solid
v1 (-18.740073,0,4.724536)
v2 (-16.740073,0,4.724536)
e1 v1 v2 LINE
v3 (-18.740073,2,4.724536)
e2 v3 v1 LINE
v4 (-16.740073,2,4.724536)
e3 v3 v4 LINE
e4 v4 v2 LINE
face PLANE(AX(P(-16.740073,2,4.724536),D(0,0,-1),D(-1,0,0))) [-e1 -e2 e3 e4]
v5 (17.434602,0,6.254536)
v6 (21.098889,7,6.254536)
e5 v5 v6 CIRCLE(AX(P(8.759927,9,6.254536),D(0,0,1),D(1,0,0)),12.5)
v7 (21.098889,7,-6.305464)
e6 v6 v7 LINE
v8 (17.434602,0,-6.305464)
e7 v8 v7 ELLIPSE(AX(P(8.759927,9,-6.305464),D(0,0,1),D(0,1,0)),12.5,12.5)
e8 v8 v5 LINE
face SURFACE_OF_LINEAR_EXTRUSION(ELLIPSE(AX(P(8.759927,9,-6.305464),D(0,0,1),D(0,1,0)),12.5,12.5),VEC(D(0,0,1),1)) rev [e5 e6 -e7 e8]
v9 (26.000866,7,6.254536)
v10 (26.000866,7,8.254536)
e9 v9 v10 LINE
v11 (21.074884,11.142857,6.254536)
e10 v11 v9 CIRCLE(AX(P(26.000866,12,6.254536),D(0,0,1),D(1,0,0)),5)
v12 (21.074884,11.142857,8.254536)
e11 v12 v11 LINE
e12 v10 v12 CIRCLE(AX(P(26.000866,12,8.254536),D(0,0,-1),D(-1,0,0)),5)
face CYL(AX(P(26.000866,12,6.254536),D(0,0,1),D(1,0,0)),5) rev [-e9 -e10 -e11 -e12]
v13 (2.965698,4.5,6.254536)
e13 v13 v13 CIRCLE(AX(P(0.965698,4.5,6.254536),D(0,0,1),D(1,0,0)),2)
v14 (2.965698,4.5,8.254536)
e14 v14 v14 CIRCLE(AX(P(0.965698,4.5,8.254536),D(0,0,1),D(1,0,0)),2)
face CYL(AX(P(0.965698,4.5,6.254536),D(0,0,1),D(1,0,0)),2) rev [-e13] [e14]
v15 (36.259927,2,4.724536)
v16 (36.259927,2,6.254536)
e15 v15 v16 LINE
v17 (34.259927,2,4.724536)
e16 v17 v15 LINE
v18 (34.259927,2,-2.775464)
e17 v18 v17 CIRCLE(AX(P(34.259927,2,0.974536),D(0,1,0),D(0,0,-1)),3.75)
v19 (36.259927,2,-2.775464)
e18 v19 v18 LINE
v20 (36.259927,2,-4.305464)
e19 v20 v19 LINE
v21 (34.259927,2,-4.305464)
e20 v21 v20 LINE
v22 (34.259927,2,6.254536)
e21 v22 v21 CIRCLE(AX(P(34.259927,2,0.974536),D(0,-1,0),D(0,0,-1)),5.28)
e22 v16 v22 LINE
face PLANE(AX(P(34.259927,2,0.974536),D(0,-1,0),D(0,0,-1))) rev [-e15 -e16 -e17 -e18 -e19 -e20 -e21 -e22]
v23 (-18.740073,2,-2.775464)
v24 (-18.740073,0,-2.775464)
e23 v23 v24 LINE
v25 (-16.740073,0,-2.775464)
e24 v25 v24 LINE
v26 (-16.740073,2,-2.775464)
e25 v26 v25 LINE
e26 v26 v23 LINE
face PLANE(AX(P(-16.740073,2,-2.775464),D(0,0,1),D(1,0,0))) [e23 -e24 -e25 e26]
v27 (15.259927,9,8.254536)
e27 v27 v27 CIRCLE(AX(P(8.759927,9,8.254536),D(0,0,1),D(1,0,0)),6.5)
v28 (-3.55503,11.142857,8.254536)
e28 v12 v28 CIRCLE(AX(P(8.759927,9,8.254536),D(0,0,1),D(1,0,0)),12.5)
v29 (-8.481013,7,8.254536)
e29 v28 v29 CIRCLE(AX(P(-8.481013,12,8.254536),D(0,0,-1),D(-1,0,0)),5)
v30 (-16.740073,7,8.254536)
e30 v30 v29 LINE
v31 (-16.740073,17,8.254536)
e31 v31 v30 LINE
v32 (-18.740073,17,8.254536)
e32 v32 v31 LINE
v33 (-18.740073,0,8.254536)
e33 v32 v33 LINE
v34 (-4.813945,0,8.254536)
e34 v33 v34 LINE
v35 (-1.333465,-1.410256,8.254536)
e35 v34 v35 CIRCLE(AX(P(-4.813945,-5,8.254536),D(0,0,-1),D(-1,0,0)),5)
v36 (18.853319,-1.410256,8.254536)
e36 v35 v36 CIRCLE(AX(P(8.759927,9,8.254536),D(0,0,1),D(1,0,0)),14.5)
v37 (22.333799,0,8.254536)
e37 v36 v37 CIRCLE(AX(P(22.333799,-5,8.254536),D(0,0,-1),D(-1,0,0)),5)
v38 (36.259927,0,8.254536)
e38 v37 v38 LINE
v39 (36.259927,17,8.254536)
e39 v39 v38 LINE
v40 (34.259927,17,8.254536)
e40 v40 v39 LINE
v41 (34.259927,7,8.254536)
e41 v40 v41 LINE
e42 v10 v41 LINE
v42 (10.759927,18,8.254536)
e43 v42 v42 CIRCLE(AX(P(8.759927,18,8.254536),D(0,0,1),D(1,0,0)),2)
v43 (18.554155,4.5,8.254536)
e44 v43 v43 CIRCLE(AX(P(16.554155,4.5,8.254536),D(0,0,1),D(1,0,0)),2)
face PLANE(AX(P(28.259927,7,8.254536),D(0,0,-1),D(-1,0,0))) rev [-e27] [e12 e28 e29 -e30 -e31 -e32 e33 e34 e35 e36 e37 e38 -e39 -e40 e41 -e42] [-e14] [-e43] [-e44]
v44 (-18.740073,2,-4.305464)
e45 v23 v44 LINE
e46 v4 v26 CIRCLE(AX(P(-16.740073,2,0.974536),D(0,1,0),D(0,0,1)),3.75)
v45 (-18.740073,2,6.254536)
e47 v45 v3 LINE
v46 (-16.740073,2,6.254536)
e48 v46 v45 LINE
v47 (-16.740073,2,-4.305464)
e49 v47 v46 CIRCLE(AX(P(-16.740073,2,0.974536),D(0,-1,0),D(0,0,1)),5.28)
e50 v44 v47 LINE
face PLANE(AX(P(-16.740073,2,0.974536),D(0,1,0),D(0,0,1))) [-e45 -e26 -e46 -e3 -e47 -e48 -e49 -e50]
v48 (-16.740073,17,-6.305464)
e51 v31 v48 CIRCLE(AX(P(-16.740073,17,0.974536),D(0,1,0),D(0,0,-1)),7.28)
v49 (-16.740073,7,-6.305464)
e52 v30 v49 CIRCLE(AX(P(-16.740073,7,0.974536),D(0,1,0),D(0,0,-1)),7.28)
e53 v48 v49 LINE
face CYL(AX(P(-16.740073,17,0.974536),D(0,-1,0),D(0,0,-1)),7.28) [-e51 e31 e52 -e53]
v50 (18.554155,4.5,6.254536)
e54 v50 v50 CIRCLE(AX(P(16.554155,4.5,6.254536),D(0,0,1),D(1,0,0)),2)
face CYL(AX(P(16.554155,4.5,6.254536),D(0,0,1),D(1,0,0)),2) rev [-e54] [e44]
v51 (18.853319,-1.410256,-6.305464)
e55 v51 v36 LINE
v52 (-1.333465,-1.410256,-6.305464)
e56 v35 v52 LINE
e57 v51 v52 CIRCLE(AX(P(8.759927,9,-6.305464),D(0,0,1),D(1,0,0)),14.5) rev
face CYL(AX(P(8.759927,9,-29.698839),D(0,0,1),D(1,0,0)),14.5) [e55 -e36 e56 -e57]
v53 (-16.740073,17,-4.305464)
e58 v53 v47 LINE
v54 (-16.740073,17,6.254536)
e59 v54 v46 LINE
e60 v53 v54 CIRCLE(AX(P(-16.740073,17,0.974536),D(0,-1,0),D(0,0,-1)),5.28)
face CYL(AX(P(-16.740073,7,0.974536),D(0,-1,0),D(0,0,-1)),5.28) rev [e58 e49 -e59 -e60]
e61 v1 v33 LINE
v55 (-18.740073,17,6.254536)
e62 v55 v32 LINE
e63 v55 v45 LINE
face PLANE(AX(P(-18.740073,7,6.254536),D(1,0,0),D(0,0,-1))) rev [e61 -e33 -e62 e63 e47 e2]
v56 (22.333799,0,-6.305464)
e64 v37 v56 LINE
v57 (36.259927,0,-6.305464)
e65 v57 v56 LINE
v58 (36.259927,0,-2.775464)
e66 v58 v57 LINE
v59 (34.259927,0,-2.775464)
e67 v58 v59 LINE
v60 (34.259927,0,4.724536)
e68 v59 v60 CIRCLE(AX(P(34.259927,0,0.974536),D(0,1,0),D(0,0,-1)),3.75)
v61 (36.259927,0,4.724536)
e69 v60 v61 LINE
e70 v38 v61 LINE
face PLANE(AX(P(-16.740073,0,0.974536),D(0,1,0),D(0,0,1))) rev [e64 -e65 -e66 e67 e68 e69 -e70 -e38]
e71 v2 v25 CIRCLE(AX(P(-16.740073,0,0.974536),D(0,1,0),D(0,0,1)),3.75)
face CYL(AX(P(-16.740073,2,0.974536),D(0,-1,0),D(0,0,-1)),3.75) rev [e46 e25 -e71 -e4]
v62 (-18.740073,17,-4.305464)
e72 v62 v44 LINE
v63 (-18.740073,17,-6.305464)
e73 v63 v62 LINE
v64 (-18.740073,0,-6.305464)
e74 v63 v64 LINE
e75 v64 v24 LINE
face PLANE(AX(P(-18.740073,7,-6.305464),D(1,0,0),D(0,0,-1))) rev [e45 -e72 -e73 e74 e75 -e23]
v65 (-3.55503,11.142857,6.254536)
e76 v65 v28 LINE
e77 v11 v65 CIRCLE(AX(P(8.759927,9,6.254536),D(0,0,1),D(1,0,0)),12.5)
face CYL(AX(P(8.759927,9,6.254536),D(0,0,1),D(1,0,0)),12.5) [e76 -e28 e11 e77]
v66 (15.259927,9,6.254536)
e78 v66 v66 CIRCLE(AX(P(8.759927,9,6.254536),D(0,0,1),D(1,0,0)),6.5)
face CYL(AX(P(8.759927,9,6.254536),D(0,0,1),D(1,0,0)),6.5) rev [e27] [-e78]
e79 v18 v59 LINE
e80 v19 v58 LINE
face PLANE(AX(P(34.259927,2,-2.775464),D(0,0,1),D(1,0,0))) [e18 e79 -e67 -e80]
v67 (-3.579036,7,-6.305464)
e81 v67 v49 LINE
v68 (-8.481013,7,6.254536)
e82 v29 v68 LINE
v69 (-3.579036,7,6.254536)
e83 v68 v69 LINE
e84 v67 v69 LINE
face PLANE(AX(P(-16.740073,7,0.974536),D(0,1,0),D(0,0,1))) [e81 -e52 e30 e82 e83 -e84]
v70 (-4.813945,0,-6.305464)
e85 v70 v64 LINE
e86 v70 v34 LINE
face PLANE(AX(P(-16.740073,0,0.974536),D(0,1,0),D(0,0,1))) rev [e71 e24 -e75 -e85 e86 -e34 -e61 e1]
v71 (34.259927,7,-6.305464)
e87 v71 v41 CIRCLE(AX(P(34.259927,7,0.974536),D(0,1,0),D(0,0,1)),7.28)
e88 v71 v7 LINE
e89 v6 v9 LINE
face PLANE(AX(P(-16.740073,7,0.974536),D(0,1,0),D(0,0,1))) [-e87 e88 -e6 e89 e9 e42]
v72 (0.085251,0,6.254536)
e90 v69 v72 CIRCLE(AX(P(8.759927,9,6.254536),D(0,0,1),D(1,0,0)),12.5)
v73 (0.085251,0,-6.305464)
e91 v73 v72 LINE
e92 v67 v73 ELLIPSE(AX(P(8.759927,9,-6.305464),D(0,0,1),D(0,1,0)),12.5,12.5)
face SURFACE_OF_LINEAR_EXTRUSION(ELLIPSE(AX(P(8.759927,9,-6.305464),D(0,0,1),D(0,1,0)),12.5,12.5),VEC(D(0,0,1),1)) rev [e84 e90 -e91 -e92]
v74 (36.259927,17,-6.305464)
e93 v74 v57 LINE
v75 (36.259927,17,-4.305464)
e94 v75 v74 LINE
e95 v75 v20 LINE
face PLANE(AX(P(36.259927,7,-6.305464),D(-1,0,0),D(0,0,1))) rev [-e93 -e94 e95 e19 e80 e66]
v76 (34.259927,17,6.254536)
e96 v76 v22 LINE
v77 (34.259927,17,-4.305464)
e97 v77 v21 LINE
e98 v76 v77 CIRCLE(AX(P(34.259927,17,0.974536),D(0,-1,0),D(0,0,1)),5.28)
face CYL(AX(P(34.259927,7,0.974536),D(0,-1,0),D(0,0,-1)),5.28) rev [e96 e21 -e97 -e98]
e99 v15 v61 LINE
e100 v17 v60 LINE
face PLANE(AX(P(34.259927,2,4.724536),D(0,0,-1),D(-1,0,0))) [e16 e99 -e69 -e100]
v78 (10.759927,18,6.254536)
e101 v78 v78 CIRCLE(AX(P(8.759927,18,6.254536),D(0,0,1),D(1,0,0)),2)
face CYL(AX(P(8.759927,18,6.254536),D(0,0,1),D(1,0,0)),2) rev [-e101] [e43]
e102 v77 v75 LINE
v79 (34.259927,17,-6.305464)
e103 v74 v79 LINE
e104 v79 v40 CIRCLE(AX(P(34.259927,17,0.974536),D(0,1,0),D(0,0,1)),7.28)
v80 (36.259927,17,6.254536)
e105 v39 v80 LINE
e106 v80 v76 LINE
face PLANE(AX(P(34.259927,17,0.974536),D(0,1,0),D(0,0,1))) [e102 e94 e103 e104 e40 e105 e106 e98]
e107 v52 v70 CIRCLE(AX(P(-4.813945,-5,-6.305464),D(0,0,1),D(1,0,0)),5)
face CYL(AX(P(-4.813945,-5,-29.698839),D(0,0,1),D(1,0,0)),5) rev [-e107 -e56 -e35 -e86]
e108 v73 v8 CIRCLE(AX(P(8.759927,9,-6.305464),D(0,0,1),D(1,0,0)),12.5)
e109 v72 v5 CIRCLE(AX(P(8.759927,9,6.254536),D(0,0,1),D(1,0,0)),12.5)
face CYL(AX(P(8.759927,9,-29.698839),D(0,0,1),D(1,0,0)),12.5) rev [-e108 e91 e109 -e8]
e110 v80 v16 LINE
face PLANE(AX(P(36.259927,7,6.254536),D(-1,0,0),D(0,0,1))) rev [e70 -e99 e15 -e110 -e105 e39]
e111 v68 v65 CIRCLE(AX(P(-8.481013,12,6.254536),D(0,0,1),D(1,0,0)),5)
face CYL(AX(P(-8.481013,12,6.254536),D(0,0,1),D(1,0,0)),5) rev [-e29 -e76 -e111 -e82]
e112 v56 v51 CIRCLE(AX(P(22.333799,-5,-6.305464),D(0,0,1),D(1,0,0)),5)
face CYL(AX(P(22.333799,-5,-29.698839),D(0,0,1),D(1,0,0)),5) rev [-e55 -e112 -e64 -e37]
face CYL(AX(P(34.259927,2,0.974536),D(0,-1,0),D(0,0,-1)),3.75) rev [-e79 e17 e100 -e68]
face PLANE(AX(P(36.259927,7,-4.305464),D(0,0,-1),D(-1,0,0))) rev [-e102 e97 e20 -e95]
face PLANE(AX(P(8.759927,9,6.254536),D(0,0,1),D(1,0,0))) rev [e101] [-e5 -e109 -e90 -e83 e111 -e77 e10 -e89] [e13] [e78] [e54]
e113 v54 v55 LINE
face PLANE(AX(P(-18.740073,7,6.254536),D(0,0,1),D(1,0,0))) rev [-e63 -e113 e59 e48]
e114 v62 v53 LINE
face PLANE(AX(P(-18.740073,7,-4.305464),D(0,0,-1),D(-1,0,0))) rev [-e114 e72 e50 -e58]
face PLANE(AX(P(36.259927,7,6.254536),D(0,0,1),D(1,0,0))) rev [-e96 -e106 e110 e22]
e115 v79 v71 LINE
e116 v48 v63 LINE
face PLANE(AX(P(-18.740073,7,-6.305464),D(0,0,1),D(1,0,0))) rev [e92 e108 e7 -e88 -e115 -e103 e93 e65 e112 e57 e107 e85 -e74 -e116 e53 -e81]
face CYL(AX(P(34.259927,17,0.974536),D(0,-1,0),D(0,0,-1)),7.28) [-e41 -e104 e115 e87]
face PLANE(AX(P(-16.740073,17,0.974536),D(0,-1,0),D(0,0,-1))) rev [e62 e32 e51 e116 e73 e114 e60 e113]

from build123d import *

# Parameters (mm, degrees)
BOSS_EXTRU_1_DEPTH      = 7
BOSS_EXTRU_3_DEPTH      = 2
ESQUISSE2_RX            = 12.5
ESQUISSE2_RY            = 12.5
ENL_V_MAT_EXTRU_1_DEPTH = 40.69604363
ESQUISSE3_R             = 12.5
ESQUISSE3_R_2           = 6.5
ESQUISSE3_R_3           = 2
BOSS_EXTRU_2_DEPTH      = 2
BOSS_EXTRU_4_DEPTH      = 14.56
CONG_2_R                = 5
BOSS_EXTRU_5_DEPTH      = 10


with BuildPart() as part:
    # Esquisse1 → Boss.-Extru.1 (new body)
    with BuildSketch(Plane(origin=(0, 0, 0), x_dir=(1, 0, 0), z_dir=(0, 1, 0))):
        with BuildLine():
            Line((36.259926639, -6.254535912), (36.259926639, -8.254535912))
            Line((36.259926639, -8.254535912), (28.259926639, -8.254535912))
            Line((28.259926639, -8.254535912), (26.259926639, -8.254535912))
            Line((26.259926639, -8.254535912), (-8.740073361, -8.254535912))
            Line((-8.740073361, -8.254535912), (-10.740073361, -8.254535912))
            Line((-10.740073361, -8.254535912), (-18.740073361, -8.254535912))
            Line((-18.740073361, -8.254535912), (-18.740073361, -6.254535912))
            Line((-18.740073361, -6.254535912), (-16.740073361, -6.254535912))
            ThreePointArc((-16.740073361, -6.254535912), (-13.378645093, -5.04629229), (-11.555635108, -1.974535912))
            ThreePointArc((-11.555635108, -1.974535912), (-11.460073361, -0.974535912), (-11.555635108, 0.025464088))
            ThreePointArc((-11.555635108, 0.025464088), (-13.378645093, 3.097220466), (-16.740073361, 4.305464088))
            Line((-16.740073361, 4.305464088), (-18.740073361, 4.305464088))
            Line((-18.740073361, 4.305464088), (-18.740073361, 6.305464088))
            Line((-18.740073361, 6.305464088), (-10.740073361, 6.305464088))
            Line((-10.740073361, 6.305464088), (-8.740073361, 6.305464088))
            Line((-8.740073361, 6.305464088), (26.259926639, 6.305464088))
            Line((26.259926639, 6.305464088), (28.259926639, 6.305464088))
            Line((28.259926639, 6.305464088), (36.259926639, 6.305464088))
            Line((36.259926639, 6.305464088), (36.259926639, 4.305464088))
            Line((36.259926639, 4.305464088), (34.259926639, 4.305464088))
            ThreePointArc((34.259926639, 4.305464088), (30.898498371, 3.097220466), (29.075488386, 0.025464088))
            ThreePointArc((29.075488386, 0.025464088), (28.979926639, -0.974535912), (29.075488386, -1.974535912))
            ThreePointArc((29.075488386, -1.974535912), (30.898498371, -5.04629229), (34.259926639, -6.254535912))
            Line((34.259926639, -6.254535912), (36.259926639, -6.254535912))
        make_face()
    extrude(amount=BOSS_EXTRU_1_DEPTH)

    # Esquisse4 → Boss.-Extru.3 (add)
    with BuildSketch(Plane.XZ):
        with BuildLine():
            Line((34.259926639, 4.724535912), (36.259926639, 4.724535912))
            Line((36.259926639, 4.724535912), (36.259926639, 6.254535912))
            Line((36.259926639, 6.254535912), (34.259926639, 6.254535912))
            ThreePointArc((34.259926639, 6.254535912), (28.979926639, 0.974535912), (34.259926639, -4.305464088))
            Line((34.259926639, -4.305464088), (36.259926639, -4.305464088))
            Line((36.259926639, -4.305464088), (36.259926639, -2.775464088))
            Line((36.259926639, -2.775464088), (34.259926639, -2.775464088))
            ThreePointArc((34.259926639, -2.775464088), (30.509926639, 0.974535912), (34.259926639, 4.724535912))
        make_face()
        with BuildLine():
            Line((-18.740073361, -2.775464088), (-18.740073361, -4.305464088))
            Line((-18.740073361, -4.305464088), (-16.740073361, -4.305464088))
            ThreePointArc((-16.740073361, -4.305464088), (-11.460073361, 0.974535912), (-16.740073361, 6.254535912))
            Line((-16.740073361, 6.254535912), (-18.740073361, 6.254535912))
            Line((-18.740073361, 6.254535912), (-18.740073361, 4.724535912))
            Line((-18.740073361, 4.724535912), (-16.740073361, 4.724535912))
            ThreePointArc((-16.740073361, 4.724535912), (-12.990073361, 0.974535912), (-16.740073361, -2.775464088))
            Line((-16.740073361, -2.775464088), (-18.740073361, -2.775464088))
        make_face()
    extrude(amount=-BOSS_EXTRU_3_DEPTH)

    # Esquisse2 → Enlèv. mat.-Extru.1 (cut, through all)
    with BuildSketch(Plane.XY.offset(8.254535912)):
        with Locations(Location((8.759926639, 9), (0, 0, 180))):
            Ellipse(ESQUISSE2_RX, ESQUISSE2_RY)
    extrude(amount=-ENL_V_MAT_EXTRU_1_DEPTH, mode=Mode.SUBTRACT)


with BuildPart() as enl_v_mat_extru_1_piece_1:
    # of the separate pieces the step leaves, piece 1, a body of its own (enl_v_mat_extru_1_pieces)
    add(part.part.solids().sort_by_distance((-18.740073361, 7, -6.305464088))[0])

    # Esquisse3 → Boss.-Extru.2 (add)
    with BuildSketch(Plane.XY.offset(8.254535912)):
        with Locations((8.759926639, 9)):
            Circle(ESQUISSE3_R)
        with Locations((8.759926639, 9)):
            Circle(ESQUISSE3_R_2, mode=Mode.SUBTRACT)
        with Locations((8.759926639, 18)):
            Circle(ESQUISSE3_R_3, mode=Mode.SUBTRACT)
        with Locations((16.554155273, 4.5)):
            Circle(ESQUISSE3_R_3, mode=Mode.SUBTRACT)
        with Locations((0.965698005, 4.5)):
            Circle(ESQUISSE3_R_3, mode=Mode.SUBTRACT)
    extrude(amount=-BOSS_EXTRU_2_DEPTH)



with BuildPart() as enl_v_mat_extru_1_piece_2:
    # of the separate pieces the step leaves, piece 2, a body of its own (enl_v_mat_extru_1_pieces)
    add(part.part.solids().sort_by_distance((34.259926639, 2, 6.254535912))[0])


with BuildPart() as enl_v_mat_extru_1_piece_1_1:
    add(enl_v_mat_extru_1_piece_1.part)

    add(enl_v_mat_extru_1_piece_2.part)  # Boss.-Extru.4 merges Enlèv. mat.-Extru.1 piece 2
    # Esquisse6 → Boss.-Extru.4 (add)
    with BuildSketch(Plane.XY.offset(8.254535912)):
        with BuildLine():
            Line((0.085250852, 0), (-2.608890362, 0))
            ThreePointArc((-2.608890362, 0), (8.759926639, -5.5), (20.12874364, 0))
            Line((20.12874364, 0), (17.434602425, 0))
            ThreePointArc((17.434602425, 0), (8.759926639, -3.5), (0.085250852, 0))
        make_face()
    extrude(amount=-BOSS_EXTRU_4_DEPTH)

    # Congé2
    # the kernel refuses this fillet: 5 mm, written as the material it adds along each edge
    with BuildSketch(Plane(origin=(20.12874364, 0, 8.254535912), x_dir=(1, 0, 0), z_dir=(0, 0, -1))) as cong_2_piece_1:
        with BuildLine():
            CenterArc((2.20505496, 5), CONG_2_R, 225.885381452, 44.114618548)
            ThreePointArc((-1.27542503, 1.41025641), (-0.614570897, 0.726057307), (0, 0))
            Line((0, 0), (2.20505496, 0))
        make_face()
    extrude(amount=14.56)
    with BuildSketch(Plane(origin=(-2.608890362, 0, 8.254535912), x_dir=(0.6707625728642448, -0.7416721451184065, 0), z_dir=(0, 0, -1))) as cong_2_piece_2:
        with BuildLine():
            CenterArc((2.229292388, 4.989240706), CONG_2_R, 222.125947854, 44.114618548)
            Line((-1.479068338, 1.635427842), (0, 0))
            ThreePointArc((0, 0), (0.950727636, 0.031201952), (1.901455272, 0))
        make_face()
    extrude(amount=14.56)
    with BuildSketch(Plane(origin=(21.098889318, 7, 6.254535912), x_dir=(1, 0, 0), z_dir=(0, 0, 1))) as cong_2_piece_3:
        with BuildLine():
            CenterArc((4.90197697, 5), CONG_2_R, 189.870889606, 80.129110394)
            ThreePointArc((-0.024005787, 4.142857143), (0.160827475, 2.072430037), (0, 0))
            Line((0, 0), (4.90197697, 0))
        make_face()
    extrude(amount=2)
    with BuildSketch(Plane(origin=(-3.579036041, 7, 6.254535912), x_dir=(0.005794402962949308, 0.9999832123062381, 0), z_dir=(0, 0, 1))) as cong_2_piece_4:
        with BuildLine():
            CenterArc((4.971512032, 4.930866692), CONG_2_R, 180.331996692, 80.129110394)
            Line((-0.02840403, 4.901894677), (0, 0))
            ThreePointArc((0, 0), (2.071463347, 0.172833269), (4.142926693, 0))
        make_face()
    extrude(amount=2)

    # Esquisse7 → Boss.-Extru.5 (add)
    with BuildSketch(Plane(origin=(0, 7, 0), x_dir=(1, 0, 0), z_dir=(0, 1, 0))):
        with BuildLine():
            Line((36.259926639, -8.254535912), (36.259926639, -6.254535912))
            Line((36.259926639, -6.254535912), (34.259926639, -6.254535912))
            ThreePointArc((34.259926639, -6.254535912), (28.979926639, -0.974535912), (34.259926639, 4.305464088))
            Line((34.259926639, 4.305464088), (36.259926639, 4.305464088))
            Line((36.259926639, 4.305464088), (36.259926639, 6.305464088))
            Line((36.259926639, 6.305464088), (34.259926639, 6.305464088))
            ThreePointArc((34.259926639, 6.305464088), (26.979926639, -0.974535912), (34.259926639, -8.254535912))
            Line((34.259926639, -8.254535912), (36.259926639, -8.254535912))
        make_face()
        with BuildLine():
            Line((-18.740073361, 6.305464088), (-16.740073361, 6.305464088))
            ThreePointArc((-16.740073361, 6.305464088), (-9.460073361, -0.974535912), (-16.740073361, -8.254535912))
            Line((-16.740073361, -8.254535912), (-18.740073361, -8.254535912))
            Line((-18.740073361, -8.254535912), (-18.740073361, -6.254535912))
            Line((-18.740073361, -6.254535912), (-16.740073361, -6.254535912))
            ThreePointArc((-16.740073361, -6.254535912), (-11.460073361, -0.974535912), (-16.740073361, 4.305464088))
            Line((-16.740073361, 4.305464088), (-18.740073361, 4.305464088))
            Line((-18.740073361, 4.305464088), (-18.740073361, 6.305464088))
        make_face()
    extrude(amount=BOSS_EXTRU_5_DEPTH)


solid = enl_v_mat_extru_1_piece_1_1.part
